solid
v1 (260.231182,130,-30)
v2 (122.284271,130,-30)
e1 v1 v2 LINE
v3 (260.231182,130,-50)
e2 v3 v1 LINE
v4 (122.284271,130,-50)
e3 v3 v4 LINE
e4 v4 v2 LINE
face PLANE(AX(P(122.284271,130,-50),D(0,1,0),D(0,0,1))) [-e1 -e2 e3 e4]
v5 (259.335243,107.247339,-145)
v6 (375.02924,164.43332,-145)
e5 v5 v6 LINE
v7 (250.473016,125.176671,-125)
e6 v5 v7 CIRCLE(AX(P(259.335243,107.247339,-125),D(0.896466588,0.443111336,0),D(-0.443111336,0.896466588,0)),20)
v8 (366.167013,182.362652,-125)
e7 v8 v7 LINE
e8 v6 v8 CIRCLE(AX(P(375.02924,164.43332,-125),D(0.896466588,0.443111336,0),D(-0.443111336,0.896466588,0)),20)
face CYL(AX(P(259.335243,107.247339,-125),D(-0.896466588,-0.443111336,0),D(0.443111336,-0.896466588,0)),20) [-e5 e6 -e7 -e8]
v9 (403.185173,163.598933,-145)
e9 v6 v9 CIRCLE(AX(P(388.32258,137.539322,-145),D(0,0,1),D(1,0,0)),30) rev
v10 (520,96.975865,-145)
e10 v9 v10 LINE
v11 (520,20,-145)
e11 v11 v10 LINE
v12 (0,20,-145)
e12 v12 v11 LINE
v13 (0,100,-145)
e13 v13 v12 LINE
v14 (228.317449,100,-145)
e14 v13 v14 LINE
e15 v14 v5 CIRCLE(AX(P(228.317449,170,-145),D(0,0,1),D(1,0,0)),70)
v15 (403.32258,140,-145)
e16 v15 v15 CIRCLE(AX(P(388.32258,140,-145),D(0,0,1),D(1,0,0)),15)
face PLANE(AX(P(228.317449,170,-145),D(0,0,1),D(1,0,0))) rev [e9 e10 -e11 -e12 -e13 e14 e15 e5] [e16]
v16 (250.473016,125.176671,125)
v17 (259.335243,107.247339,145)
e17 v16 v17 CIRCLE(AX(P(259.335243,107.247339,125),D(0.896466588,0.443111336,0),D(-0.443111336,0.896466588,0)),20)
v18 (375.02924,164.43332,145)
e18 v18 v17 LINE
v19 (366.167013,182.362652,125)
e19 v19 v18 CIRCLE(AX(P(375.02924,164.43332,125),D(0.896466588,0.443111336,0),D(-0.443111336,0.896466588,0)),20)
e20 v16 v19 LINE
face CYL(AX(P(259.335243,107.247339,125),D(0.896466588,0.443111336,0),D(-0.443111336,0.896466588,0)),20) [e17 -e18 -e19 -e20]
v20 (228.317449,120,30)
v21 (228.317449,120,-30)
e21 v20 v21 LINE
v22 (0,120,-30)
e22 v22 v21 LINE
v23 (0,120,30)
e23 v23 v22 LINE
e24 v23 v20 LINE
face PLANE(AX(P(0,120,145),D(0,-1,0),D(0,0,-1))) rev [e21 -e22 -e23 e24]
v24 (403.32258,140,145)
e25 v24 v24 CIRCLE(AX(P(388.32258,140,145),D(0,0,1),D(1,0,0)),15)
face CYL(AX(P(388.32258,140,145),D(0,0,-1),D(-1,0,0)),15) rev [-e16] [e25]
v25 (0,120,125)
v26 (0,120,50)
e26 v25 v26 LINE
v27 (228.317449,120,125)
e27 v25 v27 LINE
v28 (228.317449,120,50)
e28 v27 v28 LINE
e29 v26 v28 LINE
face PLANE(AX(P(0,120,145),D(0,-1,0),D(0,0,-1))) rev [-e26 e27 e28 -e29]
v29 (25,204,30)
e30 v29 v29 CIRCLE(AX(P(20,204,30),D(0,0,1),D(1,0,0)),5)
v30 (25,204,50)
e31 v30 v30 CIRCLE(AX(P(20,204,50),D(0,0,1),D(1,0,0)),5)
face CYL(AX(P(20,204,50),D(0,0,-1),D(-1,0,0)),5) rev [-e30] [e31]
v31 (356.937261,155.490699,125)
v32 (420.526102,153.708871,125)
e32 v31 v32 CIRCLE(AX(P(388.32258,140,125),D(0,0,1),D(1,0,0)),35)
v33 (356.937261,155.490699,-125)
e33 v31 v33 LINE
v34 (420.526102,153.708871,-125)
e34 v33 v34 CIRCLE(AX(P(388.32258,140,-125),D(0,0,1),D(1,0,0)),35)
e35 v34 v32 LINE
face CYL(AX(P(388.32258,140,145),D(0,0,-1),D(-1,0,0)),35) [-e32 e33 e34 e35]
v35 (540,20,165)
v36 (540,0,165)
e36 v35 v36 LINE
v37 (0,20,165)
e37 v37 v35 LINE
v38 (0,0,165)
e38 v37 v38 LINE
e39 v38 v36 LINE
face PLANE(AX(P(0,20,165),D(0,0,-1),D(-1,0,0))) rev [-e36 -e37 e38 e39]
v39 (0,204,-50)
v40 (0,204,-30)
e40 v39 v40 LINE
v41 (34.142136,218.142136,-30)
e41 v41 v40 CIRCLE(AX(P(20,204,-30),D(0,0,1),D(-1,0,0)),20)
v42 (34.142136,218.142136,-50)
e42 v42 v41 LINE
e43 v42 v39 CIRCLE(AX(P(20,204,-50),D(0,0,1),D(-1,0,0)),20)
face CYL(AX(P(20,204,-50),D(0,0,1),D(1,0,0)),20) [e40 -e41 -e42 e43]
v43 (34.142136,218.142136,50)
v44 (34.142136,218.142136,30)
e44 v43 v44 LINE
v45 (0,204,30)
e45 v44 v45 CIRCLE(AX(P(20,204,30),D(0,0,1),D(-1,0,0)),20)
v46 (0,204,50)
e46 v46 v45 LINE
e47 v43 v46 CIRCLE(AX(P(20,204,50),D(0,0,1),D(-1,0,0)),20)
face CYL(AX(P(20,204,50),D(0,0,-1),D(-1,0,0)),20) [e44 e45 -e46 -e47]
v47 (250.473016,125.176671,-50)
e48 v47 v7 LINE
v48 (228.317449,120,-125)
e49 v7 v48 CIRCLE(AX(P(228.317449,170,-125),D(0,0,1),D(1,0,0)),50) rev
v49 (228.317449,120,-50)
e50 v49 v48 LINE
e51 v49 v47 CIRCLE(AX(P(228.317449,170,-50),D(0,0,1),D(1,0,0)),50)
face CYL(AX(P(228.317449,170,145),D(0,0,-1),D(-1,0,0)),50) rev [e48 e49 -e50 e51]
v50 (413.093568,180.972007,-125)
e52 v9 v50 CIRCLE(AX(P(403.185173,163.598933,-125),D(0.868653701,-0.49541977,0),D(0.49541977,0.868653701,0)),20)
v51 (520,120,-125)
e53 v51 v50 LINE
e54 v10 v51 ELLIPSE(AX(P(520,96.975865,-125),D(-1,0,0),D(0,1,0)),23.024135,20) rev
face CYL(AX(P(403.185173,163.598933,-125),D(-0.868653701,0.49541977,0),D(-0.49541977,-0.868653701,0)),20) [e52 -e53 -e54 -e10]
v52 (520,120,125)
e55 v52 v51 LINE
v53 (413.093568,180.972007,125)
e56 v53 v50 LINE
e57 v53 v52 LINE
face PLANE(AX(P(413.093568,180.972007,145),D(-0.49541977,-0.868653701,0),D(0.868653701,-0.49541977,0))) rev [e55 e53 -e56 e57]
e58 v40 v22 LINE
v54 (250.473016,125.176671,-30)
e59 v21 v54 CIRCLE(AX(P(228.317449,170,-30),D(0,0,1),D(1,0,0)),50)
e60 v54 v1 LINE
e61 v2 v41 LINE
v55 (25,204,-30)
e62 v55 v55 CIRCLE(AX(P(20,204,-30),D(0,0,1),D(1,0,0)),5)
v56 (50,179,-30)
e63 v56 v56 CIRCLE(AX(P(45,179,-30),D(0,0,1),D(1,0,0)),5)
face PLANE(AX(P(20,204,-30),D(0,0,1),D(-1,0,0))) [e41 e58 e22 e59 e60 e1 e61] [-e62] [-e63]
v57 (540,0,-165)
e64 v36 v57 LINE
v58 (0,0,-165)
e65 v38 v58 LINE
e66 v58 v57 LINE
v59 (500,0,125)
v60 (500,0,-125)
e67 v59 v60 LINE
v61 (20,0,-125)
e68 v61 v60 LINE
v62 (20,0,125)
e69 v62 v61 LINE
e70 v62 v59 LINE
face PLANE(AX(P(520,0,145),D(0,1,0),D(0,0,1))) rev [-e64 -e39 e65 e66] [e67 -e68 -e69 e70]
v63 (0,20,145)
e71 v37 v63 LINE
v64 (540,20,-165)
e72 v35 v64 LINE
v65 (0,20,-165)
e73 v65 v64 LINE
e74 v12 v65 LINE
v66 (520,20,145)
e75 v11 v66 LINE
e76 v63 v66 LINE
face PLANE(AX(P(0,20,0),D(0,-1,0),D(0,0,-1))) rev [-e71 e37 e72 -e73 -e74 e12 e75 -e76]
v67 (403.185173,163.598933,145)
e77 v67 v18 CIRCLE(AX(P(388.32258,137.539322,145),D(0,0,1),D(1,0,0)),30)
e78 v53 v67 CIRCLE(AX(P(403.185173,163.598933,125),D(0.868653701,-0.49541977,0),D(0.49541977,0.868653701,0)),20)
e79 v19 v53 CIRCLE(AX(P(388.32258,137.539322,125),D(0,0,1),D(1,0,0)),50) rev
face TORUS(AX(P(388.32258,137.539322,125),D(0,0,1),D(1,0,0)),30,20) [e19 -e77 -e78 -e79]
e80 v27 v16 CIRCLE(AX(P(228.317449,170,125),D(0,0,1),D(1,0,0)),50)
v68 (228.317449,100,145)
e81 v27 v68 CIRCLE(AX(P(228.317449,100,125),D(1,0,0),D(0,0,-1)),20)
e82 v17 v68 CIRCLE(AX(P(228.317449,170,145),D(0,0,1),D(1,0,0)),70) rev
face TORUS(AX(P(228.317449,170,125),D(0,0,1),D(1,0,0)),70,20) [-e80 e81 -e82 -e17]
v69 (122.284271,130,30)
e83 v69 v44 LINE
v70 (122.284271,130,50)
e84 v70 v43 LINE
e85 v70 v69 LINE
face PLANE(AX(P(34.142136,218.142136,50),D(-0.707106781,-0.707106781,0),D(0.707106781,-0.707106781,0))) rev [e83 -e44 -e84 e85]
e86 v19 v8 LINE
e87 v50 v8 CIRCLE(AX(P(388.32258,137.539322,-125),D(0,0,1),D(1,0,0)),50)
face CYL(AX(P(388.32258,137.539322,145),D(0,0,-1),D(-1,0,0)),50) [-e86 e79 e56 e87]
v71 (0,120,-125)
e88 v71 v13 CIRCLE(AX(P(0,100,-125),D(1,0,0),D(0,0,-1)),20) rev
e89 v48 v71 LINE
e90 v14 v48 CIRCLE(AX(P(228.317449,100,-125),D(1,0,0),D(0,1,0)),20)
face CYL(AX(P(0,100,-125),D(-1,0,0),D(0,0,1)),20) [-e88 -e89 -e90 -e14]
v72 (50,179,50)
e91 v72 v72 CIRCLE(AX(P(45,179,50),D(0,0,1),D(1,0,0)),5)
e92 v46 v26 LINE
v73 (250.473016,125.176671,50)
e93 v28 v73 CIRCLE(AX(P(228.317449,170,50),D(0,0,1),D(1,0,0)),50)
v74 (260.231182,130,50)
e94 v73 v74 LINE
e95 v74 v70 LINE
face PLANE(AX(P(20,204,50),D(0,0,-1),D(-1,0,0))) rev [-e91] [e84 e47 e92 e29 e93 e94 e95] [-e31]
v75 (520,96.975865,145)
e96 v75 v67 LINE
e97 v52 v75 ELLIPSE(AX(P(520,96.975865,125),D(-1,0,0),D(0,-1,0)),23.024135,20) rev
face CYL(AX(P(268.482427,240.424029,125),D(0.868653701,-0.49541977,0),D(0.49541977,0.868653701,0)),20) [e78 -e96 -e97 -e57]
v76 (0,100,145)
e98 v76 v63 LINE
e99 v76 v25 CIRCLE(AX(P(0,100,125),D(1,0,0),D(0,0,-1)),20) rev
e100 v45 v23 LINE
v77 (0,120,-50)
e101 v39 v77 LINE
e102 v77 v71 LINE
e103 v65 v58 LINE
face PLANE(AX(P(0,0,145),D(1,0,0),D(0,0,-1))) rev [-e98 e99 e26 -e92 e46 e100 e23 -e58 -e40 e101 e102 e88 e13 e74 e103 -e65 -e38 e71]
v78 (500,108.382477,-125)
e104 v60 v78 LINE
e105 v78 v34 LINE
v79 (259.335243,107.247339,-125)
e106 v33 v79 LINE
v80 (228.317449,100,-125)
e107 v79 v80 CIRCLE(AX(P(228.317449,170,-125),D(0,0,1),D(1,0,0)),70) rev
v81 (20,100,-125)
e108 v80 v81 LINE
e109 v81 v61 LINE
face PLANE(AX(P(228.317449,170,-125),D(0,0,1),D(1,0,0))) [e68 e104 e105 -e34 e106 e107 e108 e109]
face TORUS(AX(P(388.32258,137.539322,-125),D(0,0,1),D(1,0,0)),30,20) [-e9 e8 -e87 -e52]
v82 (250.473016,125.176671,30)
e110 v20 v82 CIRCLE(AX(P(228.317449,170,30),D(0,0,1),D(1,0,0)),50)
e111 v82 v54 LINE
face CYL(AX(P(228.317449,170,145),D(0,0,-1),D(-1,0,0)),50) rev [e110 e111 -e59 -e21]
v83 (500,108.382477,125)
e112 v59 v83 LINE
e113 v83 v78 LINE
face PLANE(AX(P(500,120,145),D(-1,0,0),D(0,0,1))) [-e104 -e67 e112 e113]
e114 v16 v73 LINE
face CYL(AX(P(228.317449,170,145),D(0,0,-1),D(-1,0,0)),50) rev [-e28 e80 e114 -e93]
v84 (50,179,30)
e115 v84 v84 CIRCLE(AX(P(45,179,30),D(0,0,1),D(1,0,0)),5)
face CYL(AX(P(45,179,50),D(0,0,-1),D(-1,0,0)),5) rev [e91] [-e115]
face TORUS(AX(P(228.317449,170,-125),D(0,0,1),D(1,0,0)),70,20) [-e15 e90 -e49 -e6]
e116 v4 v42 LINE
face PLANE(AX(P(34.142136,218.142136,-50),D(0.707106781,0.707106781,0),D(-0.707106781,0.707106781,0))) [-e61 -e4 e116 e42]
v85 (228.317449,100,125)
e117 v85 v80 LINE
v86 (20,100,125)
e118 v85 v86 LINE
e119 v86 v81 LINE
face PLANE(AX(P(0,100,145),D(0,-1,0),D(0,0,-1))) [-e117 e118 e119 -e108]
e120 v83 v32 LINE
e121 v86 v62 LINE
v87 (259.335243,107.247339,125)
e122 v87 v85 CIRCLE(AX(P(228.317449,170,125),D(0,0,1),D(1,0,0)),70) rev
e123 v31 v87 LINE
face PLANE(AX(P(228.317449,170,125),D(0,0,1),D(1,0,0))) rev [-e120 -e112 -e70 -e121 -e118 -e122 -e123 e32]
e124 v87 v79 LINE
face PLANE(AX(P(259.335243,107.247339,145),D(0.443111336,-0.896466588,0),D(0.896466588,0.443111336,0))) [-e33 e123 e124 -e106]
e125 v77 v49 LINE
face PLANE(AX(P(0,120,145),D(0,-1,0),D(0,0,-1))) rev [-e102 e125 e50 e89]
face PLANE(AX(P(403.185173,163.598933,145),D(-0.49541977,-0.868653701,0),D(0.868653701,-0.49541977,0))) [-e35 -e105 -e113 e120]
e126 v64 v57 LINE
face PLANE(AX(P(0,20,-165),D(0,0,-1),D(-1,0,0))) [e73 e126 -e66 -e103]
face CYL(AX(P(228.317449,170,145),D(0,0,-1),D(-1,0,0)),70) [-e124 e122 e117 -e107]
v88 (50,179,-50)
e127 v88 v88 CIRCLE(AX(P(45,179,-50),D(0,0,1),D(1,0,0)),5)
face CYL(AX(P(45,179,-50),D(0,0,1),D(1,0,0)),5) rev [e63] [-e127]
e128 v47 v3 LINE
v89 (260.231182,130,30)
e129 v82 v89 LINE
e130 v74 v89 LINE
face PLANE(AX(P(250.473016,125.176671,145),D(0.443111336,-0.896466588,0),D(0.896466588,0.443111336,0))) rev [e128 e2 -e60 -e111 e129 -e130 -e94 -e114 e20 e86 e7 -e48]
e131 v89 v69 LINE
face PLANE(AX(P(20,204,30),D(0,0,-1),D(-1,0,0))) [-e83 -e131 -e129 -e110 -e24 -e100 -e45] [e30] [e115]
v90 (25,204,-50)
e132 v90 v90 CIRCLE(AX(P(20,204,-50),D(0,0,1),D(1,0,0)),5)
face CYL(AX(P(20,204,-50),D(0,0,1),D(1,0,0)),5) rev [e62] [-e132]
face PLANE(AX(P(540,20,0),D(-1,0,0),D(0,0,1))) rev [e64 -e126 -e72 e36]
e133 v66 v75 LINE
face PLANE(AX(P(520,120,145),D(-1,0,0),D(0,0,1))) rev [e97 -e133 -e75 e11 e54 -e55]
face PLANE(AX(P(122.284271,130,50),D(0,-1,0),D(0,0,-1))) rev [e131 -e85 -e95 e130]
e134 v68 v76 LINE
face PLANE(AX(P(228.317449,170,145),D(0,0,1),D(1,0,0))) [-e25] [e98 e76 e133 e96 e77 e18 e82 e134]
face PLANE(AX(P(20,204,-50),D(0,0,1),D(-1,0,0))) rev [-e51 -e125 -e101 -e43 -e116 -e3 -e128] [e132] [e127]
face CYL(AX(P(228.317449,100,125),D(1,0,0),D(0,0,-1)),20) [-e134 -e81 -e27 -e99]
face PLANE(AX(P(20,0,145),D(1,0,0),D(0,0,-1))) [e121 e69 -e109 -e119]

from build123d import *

# Parameters (mm, degrees)
SKETCH1_R           = 15
BOSS_EXTRUDE1_DEPTH = 145
BOSS_EXTRUDE2_START = 50
SKETCH2_R           = 5
BOSS_EXTRUDE2_DEPTH = 20
SHELL1_START        = -125
SHELL1_DEPTH        = 250
SKETCH4_W           = 520
SKETCH4_H           = 290
BOSS_EXTRUDE3_DEPTH = 20
FILLET1_R           = 20


# Read off the part's stored shape, not the designer's step: Shell1
with BuildPart() as part:
    # Sketch1 → Boss-Extrude1 (new, symmetric)
    with BuildSketch(Plane.XY):
        with BuildLine():
            Line((0, 0), (0, 120))
            Line((0, 120), (228.31744945, 120))
            ThreePointArc((228.31744945, 120), (239.69359838, 121.311364411), (250.473016236, 125.176670579))
            Line((250.473016236, 125.176670579), (366.167012988, 182.362651739))
            ThreePointArc((366.167012988, 182.362651739), (389.803653925, 187.517381697), (413.093568272, 180.972007347))
            Line((413.093568272, 180.972007347), (520, 120))
            Line((520, 120), (520, 0))
            Line((520, 0), (0, 0))
        make_face()
        with Locations((388.322579774, 140)):
            Circle(SKETCH1_R, mode=Mode.SUBTRACT)
    extrude(amount=BOSS_EXTRUDE1_DEPTH, both=True)

    # Sketch2 → Boss-Extrude2 (add)
    with BuildSketch(Plane.XY.offset(BOSS_EXTRUDE2_START)):
        with BuildLine():
            Line((0, 120), (0, 204))
            ThreePointArc((0, 204), (12.346331353, 222.47759065), (34.142135624, 218.142135624))
            Line((34.142135624, 218.142135624), (122.284271247, 130))
            Line((122.284271247, 130), (260.23118156, 130))
            Line((260.23118156, 130), (250.473016236, 125.176670579))
            ThreePointArc((250.473016236, 125.176670579), (239.69359838, 121.311364411), (228.31744945, 120))
            Line((228.31744945, 120), (0, 120))
        make_face()
        with Locations((20, 204)):
            Circle(SKETCH2_R, mode=Mode.SUBTRACT)
        with Locations((45, 179)):
            Circle(SKETCH2_R, mode=Mode.SUBTRACT)
    boss_extrude2 = extrude(amount=-BOSS_EXTRUDE2_DEPTH)

    # Mirror1: Boss-Extrude2 across plane
    add(boss_extrude2.mirror(Plane.XY))

    # Shell1 outline → Shell1 (cut)
    with BuildSketch(Plane.XY.offset(SHELL1_START)):
        with BuildLine():
            Line((356.937260838, 155.490698991), (259.33524295, 107.247338811))
            ThreePointArc((259.33524295, 107.247338811), (244.244057952, 101.835910175), (228.31744945, 100))
            Line((228.31744945, 100), (20, 100))
            Line((20, 100), (20, 0))
            Line((20, 0), (500, 0))
            Line((500, 0), (500, 108.382476706))
            Line((500, 108.382476706), (420.526102167, 153.708871052))
            ThreePointArc((420.526102167, 153.708871052), (387.342226815, 105.013732579), (356.937260838, 155.490698991))
        make_face()
    extrude(amount=SHELL1_DEPTH, mode=Mode.SUBTRACT)

    # Sketch4 → Boss-Extrude3 (add)
    # profile 1 of 2: a face of its own
    with BuildSketch(Plane.XZ):
        Polygon((540, 165), (0, 165), (0, 145), (520, 145), (520, -145), (0, -145), (0, -165), (540, -165), align=None)
    # profile 2 of 2: a face of its own
    with BuildSketch(Plane.XZ):
        with Locations((260, 0)):
            Rectangle(SKETCH4_W, SKETCH4_H)
        Polygon((20, 125), (228.31744945, 125), (259.33524295, 125), (353.322579774, 125), (356.937260838, 125), (420.526102167, 125), (423.322579774, 125), (500, 125), (500, -125), (423.322579774, -125), (420.526102167, -125), (356.937260838, -125), (353.322579774, -125), (259.33524295, -125), (228.31744945, -125), (20, -125), align=None, mode=Mode.SUBTRACT)
    extrude(amount=-BOSS_EXTRUDE3_DEPTH)

    # Fillet1
    fillet1_edges = [part.edges().sort_by_distance(p)[0] for p in [
        (389.803653925, 187.517381697, -145),
        (466.546784136, 150.486003673, -145),
        (466.546784136, 150.486003673, 145),
        (389.803653925, 187.517381697, 145),
        (308.320014612, 153.769661159, 145),
        (239.69359838, 121.311364411, 145),
        (114.158724725, 120, 145),
        (114.158724725, 120, -145),
        (239.69359838, 121.311364411, -145),
        (308.320014612, 153.769661159, -145),
    ]]
    fillet(fillet1_edges, radius=FILLET1_R)


solid = part.part
